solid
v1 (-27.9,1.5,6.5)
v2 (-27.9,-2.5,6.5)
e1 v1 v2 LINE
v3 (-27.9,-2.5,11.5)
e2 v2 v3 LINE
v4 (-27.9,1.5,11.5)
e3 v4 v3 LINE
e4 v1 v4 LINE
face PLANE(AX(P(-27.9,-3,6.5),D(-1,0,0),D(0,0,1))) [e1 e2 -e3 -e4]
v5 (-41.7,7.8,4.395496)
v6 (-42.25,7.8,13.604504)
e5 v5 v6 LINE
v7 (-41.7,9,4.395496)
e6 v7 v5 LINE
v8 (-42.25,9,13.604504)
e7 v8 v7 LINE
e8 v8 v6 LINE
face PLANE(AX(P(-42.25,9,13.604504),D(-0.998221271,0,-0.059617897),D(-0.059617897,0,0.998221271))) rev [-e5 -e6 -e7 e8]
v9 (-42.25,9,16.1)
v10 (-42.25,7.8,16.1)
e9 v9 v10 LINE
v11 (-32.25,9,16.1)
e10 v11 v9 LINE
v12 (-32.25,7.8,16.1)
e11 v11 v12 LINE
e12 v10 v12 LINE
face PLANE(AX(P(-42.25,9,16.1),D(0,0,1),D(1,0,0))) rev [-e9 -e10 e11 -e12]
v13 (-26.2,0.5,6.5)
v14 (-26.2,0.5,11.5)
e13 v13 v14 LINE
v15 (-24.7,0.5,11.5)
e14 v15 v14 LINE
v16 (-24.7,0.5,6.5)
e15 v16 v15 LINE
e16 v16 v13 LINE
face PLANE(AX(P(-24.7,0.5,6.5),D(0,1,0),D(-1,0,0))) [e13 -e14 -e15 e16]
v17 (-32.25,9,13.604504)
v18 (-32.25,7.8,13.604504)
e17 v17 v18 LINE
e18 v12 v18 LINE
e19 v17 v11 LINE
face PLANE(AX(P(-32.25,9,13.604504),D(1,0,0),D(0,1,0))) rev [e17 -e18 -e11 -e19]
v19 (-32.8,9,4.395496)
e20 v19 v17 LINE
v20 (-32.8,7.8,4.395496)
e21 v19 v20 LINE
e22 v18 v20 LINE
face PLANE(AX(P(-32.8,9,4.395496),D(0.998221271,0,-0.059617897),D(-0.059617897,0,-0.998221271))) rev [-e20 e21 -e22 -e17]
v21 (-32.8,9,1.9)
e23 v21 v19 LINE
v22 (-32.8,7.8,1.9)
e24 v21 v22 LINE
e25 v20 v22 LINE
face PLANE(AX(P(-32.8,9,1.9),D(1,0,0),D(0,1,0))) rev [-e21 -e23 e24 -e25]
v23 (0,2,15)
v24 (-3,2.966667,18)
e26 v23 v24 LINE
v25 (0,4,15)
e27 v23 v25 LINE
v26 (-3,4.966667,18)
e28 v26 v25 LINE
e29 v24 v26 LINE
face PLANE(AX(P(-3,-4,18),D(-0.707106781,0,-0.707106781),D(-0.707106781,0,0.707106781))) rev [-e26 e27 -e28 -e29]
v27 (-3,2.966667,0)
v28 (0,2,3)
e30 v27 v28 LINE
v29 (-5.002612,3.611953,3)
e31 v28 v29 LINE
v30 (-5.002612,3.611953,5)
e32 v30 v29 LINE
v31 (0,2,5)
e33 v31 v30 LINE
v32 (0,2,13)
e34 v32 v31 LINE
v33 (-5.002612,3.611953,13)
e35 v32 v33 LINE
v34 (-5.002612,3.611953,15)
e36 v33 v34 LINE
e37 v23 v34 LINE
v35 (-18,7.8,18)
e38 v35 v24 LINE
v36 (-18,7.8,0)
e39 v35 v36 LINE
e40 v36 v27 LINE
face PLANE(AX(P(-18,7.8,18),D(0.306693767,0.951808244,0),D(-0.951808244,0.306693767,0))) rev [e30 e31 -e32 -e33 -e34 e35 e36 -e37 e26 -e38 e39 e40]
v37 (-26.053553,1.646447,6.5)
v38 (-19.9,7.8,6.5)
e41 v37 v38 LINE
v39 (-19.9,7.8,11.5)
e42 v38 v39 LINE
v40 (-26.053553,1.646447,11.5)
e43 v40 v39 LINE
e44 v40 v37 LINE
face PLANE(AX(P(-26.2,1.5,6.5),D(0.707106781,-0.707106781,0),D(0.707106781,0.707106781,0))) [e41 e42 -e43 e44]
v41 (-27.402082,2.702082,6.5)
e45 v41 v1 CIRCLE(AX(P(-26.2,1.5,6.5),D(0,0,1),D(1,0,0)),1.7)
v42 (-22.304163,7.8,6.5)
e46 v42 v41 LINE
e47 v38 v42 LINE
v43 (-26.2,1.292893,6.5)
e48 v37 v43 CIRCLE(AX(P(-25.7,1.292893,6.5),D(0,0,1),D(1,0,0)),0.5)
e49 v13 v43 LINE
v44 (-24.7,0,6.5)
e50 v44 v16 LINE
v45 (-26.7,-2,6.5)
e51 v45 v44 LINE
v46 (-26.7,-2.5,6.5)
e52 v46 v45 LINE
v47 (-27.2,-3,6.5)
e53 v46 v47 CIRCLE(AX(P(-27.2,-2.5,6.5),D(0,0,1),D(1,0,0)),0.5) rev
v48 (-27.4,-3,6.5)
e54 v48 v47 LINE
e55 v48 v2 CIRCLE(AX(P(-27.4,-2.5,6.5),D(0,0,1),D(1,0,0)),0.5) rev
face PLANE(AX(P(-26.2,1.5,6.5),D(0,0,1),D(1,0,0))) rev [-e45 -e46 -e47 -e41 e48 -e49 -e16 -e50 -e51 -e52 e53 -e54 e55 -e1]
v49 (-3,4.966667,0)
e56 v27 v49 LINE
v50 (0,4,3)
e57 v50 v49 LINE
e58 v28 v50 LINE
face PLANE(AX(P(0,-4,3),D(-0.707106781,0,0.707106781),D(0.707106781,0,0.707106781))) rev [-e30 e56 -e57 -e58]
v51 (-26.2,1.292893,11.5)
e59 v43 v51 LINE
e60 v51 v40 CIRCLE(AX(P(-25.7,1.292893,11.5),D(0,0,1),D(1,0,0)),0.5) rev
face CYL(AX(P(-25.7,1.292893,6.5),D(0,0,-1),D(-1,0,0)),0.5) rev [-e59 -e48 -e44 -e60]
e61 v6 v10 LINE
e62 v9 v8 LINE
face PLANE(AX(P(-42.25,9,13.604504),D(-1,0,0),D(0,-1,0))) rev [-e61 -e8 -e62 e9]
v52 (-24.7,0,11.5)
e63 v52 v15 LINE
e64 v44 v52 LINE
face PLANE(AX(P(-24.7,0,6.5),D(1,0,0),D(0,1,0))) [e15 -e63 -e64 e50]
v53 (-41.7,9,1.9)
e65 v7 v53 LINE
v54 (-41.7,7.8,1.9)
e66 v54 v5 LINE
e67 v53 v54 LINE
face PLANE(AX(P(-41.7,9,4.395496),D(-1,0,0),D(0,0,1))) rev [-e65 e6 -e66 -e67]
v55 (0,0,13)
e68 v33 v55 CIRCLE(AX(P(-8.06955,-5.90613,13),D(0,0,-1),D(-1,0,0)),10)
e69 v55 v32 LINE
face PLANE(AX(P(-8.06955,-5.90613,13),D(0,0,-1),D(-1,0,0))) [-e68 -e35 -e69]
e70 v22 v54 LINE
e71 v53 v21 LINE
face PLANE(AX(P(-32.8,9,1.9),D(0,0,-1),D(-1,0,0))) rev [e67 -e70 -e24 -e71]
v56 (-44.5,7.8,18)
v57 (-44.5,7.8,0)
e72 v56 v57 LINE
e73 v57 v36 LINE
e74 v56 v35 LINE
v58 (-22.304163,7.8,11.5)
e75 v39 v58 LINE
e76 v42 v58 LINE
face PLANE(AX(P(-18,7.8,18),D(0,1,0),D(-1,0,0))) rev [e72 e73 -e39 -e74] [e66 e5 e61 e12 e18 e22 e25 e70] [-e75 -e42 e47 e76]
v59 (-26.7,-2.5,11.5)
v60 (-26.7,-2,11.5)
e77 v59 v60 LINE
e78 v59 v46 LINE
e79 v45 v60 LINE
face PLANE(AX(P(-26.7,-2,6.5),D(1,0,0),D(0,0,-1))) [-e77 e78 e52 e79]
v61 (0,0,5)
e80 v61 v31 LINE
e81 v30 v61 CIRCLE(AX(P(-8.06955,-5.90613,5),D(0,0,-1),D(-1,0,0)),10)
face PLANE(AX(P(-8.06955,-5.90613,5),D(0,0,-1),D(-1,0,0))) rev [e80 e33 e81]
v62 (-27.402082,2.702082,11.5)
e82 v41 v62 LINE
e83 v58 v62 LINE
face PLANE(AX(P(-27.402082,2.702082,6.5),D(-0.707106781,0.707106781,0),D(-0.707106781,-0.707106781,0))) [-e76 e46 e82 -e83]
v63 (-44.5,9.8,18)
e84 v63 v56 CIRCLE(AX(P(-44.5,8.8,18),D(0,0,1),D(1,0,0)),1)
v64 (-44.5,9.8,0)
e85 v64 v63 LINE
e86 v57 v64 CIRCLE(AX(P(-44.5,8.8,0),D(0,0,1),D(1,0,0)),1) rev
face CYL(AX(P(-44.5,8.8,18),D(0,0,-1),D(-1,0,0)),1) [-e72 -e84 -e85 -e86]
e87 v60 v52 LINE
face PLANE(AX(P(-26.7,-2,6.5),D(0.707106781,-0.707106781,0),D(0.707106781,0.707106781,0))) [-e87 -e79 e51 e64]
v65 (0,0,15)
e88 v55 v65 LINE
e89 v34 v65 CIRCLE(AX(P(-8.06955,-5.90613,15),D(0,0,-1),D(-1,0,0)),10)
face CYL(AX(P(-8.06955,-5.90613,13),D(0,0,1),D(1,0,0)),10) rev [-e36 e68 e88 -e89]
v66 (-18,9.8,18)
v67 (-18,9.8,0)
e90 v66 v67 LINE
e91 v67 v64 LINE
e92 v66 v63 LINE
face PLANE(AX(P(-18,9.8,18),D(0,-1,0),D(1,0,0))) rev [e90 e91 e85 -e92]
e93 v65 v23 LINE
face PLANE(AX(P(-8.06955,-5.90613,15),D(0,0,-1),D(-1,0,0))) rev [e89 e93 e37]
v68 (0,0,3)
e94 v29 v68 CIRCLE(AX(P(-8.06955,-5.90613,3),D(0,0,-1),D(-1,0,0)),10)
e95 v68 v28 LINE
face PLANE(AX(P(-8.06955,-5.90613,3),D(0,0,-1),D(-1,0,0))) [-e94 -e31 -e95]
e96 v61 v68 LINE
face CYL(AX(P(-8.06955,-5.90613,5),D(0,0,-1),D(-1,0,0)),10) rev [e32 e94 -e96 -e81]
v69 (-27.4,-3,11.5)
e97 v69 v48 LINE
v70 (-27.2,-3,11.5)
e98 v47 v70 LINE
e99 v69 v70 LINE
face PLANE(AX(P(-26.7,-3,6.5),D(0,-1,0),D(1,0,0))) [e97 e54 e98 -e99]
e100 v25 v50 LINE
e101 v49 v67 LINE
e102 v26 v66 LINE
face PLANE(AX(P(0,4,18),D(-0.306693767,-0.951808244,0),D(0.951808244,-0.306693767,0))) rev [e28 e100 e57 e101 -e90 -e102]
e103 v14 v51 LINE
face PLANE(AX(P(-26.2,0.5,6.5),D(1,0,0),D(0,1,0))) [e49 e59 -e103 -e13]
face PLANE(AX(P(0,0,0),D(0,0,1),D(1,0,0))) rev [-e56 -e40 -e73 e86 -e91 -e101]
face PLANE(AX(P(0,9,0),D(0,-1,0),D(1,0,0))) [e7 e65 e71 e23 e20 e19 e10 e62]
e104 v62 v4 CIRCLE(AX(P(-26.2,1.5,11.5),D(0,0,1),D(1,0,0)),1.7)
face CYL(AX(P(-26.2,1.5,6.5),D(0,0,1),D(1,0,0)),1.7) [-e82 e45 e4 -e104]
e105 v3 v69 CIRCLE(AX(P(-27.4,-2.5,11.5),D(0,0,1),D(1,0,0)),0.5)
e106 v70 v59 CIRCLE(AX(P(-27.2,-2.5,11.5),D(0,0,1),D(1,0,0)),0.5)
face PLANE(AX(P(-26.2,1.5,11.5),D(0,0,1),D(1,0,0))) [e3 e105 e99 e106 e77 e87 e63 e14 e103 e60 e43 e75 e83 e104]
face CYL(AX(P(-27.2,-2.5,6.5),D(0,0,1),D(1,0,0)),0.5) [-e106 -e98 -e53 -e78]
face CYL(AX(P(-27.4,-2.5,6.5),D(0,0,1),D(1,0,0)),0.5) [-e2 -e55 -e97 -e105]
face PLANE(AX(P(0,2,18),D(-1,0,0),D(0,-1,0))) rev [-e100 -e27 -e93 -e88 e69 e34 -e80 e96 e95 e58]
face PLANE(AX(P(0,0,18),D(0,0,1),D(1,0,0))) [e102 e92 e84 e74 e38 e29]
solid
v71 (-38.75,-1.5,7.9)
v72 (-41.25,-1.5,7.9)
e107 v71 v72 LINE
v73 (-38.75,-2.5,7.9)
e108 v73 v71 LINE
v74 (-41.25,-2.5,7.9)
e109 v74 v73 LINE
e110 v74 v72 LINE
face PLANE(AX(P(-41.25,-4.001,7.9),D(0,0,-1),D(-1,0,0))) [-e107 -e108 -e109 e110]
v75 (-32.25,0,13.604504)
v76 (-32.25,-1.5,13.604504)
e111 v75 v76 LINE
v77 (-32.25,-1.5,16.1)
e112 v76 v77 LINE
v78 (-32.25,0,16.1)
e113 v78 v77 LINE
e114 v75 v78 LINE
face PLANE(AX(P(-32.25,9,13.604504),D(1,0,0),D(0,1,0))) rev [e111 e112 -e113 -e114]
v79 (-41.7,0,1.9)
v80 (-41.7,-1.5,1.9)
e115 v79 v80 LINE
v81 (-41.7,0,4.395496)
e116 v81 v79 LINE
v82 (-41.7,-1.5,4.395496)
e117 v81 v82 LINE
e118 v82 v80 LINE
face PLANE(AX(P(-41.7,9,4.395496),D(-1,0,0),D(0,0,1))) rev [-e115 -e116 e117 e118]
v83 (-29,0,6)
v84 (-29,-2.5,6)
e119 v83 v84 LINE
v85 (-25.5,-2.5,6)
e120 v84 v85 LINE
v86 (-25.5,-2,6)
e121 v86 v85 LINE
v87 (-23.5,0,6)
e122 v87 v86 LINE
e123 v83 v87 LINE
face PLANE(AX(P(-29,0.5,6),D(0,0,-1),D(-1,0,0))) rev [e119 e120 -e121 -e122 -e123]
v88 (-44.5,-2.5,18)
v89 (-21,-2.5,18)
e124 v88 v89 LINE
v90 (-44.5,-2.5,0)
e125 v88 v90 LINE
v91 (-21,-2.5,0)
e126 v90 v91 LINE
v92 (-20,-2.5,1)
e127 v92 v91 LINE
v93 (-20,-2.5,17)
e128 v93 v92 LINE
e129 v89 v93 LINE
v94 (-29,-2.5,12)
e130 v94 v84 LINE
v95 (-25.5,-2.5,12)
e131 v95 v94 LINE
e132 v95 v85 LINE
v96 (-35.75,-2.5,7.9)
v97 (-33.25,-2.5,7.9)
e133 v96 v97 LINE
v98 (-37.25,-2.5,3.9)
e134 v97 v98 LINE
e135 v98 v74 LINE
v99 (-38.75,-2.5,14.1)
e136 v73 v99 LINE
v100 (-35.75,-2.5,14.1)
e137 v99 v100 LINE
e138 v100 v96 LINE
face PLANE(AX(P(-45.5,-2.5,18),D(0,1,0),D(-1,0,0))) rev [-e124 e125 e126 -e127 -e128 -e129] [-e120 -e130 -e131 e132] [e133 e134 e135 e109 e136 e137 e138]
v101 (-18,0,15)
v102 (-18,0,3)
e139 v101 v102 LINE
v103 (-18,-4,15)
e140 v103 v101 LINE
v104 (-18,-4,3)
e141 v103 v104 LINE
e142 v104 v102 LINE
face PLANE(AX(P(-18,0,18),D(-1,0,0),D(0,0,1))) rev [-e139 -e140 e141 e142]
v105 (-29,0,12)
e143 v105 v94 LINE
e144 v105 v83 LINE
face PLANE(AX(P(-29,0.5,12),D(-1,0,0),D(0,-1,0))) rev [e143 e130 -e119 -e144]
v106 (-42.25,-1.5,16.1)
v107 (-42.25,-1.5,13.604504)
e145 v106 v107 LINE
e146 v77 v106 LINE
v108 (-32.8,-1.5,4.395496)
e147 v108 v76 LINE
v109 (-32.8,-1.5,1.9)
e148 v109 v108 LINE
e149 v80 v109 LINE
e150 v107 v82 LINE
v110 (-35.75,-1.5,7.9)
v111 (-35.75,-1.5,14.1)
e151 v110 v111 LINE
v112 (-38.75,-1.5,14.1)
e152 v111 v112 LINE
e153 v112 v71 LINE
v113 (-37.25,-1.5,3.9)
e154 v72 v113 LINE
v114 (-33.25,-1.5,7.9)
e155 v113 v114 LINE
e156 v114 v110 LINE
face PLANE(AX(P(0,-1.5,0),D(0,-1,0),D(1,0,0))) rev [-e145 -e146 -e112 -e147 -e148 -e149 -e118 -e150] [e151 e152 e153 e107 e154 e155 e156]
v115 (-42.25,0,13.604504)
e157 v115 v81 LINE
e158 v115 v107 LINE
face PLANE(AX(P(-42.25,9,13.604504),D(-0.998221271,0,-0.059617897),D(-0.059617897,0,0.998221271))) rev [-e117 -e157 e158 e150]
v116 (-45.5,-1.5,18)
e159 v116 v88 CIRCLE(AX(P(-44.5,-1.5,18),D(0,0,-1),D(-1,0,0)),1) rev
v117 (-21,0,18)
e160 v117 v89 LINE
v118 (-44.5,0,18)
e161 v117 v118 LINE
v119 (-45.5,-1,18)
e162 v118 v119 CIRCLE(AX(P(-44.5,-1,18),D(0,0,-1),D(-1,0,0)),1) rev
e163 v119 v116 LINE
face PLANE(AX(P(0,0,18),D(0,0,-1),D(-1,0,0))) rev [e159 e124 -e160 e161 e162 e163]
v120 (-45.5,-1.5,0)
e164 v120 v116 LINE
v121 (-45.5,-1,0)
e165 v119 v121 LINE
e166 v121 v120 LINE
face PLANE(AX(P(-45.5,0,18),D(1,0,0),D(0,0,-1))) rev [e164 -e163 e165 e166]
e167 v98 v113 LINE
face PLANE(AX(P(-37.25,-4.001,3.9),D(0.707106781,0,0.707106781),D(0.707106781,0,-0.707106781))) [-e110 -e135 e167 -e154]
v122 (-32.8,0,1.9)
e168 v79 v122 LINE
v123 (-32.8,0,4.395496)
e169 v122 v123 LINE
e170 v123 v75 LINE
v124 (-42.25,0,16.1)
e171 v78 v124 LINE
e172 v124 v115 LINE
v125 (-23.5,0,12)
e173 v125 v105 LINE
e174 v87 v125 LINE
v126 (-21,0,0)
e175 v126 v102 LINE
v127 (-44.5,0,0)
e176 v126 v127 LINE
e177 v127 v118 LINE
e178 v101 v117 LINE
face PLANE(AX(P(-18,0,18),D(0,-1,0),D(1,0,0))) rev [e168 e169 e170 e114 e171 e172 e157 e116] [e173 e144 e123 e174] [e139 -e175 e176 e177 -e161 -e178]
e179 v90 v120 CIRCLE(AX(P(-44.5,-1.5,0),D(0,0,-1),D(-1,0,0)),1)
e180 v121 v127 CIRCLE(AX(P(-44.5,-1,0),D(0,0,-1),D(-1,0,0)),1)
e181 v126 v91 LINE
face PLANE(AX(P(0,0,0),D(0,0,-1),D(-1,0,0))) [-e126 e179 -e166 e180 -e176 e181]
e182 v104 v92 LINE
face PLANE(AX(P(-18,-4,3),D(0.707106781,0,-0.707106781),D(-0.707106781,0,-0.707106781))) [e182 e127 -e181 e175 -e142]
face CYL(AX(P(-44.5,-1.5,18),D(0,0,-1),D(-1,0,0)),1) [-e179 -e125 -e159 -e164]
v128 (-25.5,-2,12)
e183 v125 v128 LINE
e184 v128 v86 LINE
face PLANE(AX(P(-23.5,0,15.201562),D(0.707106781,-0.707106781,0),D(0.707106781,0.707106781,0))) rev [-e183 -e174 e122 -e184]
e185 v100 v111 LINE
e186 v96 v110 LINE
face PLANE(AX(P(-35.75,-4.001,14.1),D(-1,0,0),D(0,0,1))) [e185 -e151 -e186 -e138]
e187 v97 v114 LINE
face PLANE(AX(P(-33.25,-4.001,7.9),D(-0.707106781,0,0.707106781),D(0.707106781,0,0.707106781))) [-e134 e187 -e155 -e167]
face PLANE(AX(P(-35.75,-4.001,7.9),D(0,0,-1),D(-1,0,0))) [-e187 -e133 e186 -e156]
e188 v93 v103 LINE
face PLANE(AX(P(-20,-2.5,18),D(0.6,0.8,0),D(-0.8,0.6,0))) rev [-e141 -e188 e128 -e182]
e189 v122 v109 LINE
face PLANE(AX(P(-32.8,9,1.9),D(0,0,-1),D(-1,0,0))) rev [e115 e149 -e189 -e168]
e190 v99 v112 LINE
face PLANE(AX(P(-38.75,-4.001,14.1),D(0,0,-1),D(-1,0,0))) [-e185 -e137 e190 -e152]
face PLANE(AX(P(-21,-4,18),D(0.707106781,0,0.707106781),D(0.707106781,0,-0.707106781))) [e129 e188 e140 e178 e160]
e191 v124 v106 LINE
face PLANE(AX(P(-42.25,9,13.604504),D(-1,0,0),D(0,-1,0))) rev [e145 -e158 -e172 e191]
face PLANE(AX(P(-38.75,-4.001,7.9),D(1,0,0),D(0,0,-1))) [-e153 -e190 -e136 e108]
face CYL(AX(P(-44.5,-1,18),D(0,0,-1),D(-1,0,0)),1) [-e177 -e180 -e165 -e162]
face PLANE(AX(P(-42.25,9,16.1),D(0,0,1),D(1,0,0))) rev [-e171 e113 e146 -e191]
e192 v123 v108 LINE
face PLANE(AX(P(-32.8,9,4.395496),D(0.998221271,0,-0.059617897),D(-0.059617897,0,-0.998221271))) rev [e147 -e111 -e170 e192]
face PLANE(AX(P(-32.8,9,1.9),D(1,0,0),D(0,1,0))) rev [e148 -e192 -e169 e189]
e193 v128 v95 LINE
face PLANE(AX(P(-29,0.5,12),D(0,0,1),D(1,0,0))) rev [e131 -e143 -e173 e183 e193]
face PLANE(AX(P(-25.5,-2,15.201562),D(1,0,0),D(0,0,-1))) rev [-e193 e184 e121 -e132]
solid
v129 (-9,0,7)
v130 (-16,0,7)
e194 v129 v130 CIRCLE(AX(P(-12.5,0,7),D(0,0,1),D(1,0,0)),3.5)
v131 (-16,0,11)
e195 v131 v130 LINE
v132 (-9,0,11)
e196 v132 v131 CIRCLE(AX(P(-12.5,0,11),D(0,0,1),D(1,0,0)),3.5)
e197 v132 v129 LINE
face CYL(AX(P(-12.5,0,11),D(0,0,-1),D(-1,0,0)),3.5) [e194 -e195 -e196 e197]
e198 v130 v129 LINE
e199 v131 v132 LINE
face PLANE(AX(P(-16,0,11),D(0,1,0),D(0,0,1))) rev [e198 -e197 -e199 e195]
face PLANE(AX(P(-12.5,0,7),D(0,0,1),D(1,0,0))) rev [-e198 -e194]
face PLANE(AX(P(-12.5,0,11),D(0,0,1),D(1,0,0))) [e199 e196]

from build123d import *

# Parameters (mm, degrees)
BOSS_EXTRUDE1_DEPTH     = 18
BOSS_EXTRUDE1_2_DEPTH   = 18
SKETCH2_W               = 5.5
SKETCH2_H               = 6
CUT_EXTRUDE1_DEPTH      = 3
BOSS_EXTRUDE2_DEPTH     = 6
BOSS_EXTRUDE3_START     = -9
BOSS_EXTRUDE3_DEPTH     = 2.5
FILLET7_R               = 1
FILLET8_R               = 1
FILLET10_R              = 1
FILLET11_R              = 1
BOSS_EXTRUDE4_START     = -3
BOSS_EXTRUDE4_DEPTH     = 2
BOSS_EXTRUDE5_START     = -13
BOSS_EXTRUDE5_DEPTH     = 2
FILLET12_R              = 0.5
FILLET13_R              = 0.5
CUT_EXTRUDE2_DEPTH      = 1.5
CUT_EXTRUDE2_DEPTH_BACK = 9
CUT_EXTRUDE3_DEPTH      = 51.839846577
CUT_EXTRUDE9_DEPTH      = 51.453344785
CUT_EXTRUDE9_DEPTH_BACK = 2.5
CUT_EXTRUDE10_DEPTH     = 1
BOSS_EXTRUDE8_START     = 7
BOSS_EXTRUDE8_DEPTH     = 4


with BuildPart() as part:
    # Sketch1 → Boss-Extrude1 (new body)
    with BuildSketch(Plane.XY):
        Polygon((0, 4), (-18, 9.8), (-45.5, 9.8), (-45.5, 7.8), (-18, 7.8), (0, 2), align=None)
    extrude(amount=BOSS_EXTRUDE1_DEPTH)

    # Sketch4 → Boss-Extrude3 (add, symmetric)
    with BuildSketch(Plane.XY.offset(18).offset(BOSS_EXTRUDE3_START)):
        with BuildLine():
            Line((-26.7, -2), (-24.7, 0))
            Line((-24.7, 0), (-24.7, 0.5))
            Line((-24.7, 0.5), (-26.2, 0.5))
            Line((-26.2, 0.5), (-26.2, 1.5))
            Line((-26.2, 1.5), (-19.9, 7.8))
            Line((-19.9, 7.8), (-22.304163056, 7.8))
            Line((-22.304163056, 7.8), (-27.402081528, 2.702081528))
            ThreePointArc((-27.402081528, 2.702081528), (-27.770595205, 2.150561835), (-27.9, 1.5))
            Line((-27.9, 1.5), (-27.9, -3))
            Line((-27.9, -3), (-26.7, -3))
            Line((-26.7, -3), (-26.7, -2))
        make_face()
    extrude(amount=BOSS_EXTRUDE3_DEPTH, both=True)

    # Fillet8
    fillet8_edges = [part.edges().sort_by_distance(p)[0] for p in [
        (-45.5, 7.8, 9),
    ]]
    fillet(fillet8_edges, radius=FILLET8_R)

    # Fillet10
    fillet10_edges = [part.edges().sort_by_distance(p)[0] for p in [
        (-45.5, 9.8, 9),
    ]]
    fillet(fillet10_edges, radius=FILLET10_R - 0.0001)  # a hair under: the kernel refuses the full size

    # Sketch5 → Boss-Extrude4 (add)
    with BuildSketch(Plane.XY.offset(18).offset(BOSS_EXTRUDE4_START)):
        with BuildLine():
            Line((0, 2), (0, 0))
            ThreePointArc((0, 0), (-2.215757041, 2.201466243), (-5.002612018, 3.611952761))
            Line((-5.002612018, 3.611952761), (0, 2))
        make_face()
    extrude(amount=-BOSS_EXTRUDE4_DEPTH)

    # Sketch5<2> → Boss-Extrude5 (add)
    with BuildSketch(Plane.XY.offset(18).offset(BOSS_EXTRUDE5_START)):
        with BuildLine():
            Line((0, 2), (0, 0))
            ThreePointArc((0, 0), (-2.215757041, 2.201466243), (-5.002612018, 3.611952761))
            Line((-5.002612018, 3.611952761), (0, 2))
        make_face()
    extrude(amount=-BOSS_EXTRUDE5_DEPTH)

    # Fillet12
    fillet12_edges = [part.edges().sort_by_distance(p)[0] for p in [
        (-26.7, -3, 9),
        (-27.9, -3, 9),
    ]]
    fillet(fillet12_edges, radius=FILLET12_R)

    # Fillet13
    fillet13_edges = [part.edges().sort_by_distance(p)[0] for p in [
        (-26.2, 1.5, 9),
    ]]
    fillet(fillet13_edges, radius=FILLET13_R)


with BuildPart() as body_2:
    # Sketch1 → Boss-Extrude1 2 (new body)
    with BuildSketch(Plane.XY):
        Polygon((-18, 0), (-45.5, 0), (-45.5, -2.5), (-20, -2.5), (-18, -4), align=None)
    extrude(amount=BOSS_EXTRUDE1_2_DEPTH)

    # Sketch2 → Cut-Extrude1 (cut)
    with BuildSketch(Plane.XZ.offset(2.5)):
        with Locations((-26.25, 9)):
            Rectangle(SKETCH2_W, SKETCH2_H)
    extrude(amount=-CUT_EXTRUDE1_DEPTH, mode=Mode.SUBTRACT)

    # Sketch3 → Boss-Extrude2 (add)
    with BuildSketch(Plane.XY.offset(6)):
        Polygon((-23.5, 0), (-25.5, -2), (-25.5, -2.5), (-23.5, -2.5), align=None)
    extrude(amount=BOSS_EXTRUDE2_DEPTH)

    # Fillet7
    fillet7_edges = [body_2.edges().sort_by_distance(p)[0] for p in [
        (-45.5, 0, 9),
    ]]
    fillet(fillet7_edges, radius=FILLET7_R)

    # Fillet11
    fillet11_edges = [body_2.edges().sort_by_distance(p)[0] for p in [
        (-45.5, -2.5, 9),
    ]]
    fillet(fillet11_edges, radius=FILLET11_R)


with BuildPart() as cut_extrude2_tool:
    # Sketch6 → Cut-Extrude2 (new, two sides: drawn at the far end of the back side and taken through both)
    with BuildSketch(Plane.XZ.offset(-CUT_EXTRUDE2_DEPTH_BACK)):
        Polygon((-32.8, 1.9), (-41.7, 1.9), (-41.7, 4.395495943), (-42.25, 13.604504057), (-42.25, 16.1), (-32.25, 16.1), (-32.25, 13.604504057), (-32.8, 4.395495943), align=None)
    extrude(amount=CUT_EXTRUDE2_DEPTH + CUT_EXTRUDE2_DEPTH_BACK)


with BuildPart() as part_1:
    add(part.part)

    # Cut-Extrude2: cut by cut_extrude2_tool
    add(cut_extrude2_tool.part, mode=Mode.SUBTRACT)

    # Sketch7 → Cut-Extrude3 (cut, through all)
    with BuildSketch(Plane(origin=(0, 9.8, 0), x_dir=(1, 0, 0), z_dir=(0, 1, 0))):
        Polygon((0, -3), (-3, 0), (-45.5, 0), (-45.5, -18), (-3, -18), (0, -15), (2, -15), (2, -20), (-48, -20), (-48, 2), (2, 2), (2, -3), align=None)
    extrude(amount=-CUT_EXTRUDE3_DEPTH, mode=Mode.SUBTRACT)


with BuildPart() as body_2_1:
    add(body_2.part)

    # Cut-Extrude2: cut by cut_extrude2_tool
    add(cut_extrude2_tool.part, mode=Mode.SUBTRACT)

    # Sketch8 → Cut-Extrude9 (cut, two sides: drawn at the far end of the back side and taken through both)
    with BuildSketch(Plane.XZ.offset(2.5).offset(-CUT_EXTRUDE9_DEPTH_BACK)):
        Polygon((-18, 15), (-16, 15), (-16, 20), (-47.5, 20), (-47.5, -2), (-16, -2), (-16, 3), (-18, 3), (-21, 0), (-45.5, 0), (-45.5, 18), (-21, 18), align=None)
    extrude(amount=CUT_EXTRUDE9_DEPTH + CUT_EXTRUDE9_DEPTH_BACK, mode=Mode.SUBTRACT)

    # Sketch9 → Cut-Extrude10 (cut)
    with BuildSketch(Plane.XZ.offset(1.5)):
        Polygon((-38.75, 14.1), (-35.75, 14.1), (-35.75, 7.9), (-33.25, 7.9), (-37.25, 3.9), (-41.25, 7.9), (-38.75, 7.9), align=None)
    extrude(amount=CUT_EXTRUDE10_DEPTH, mode=Mode.SUBTRACT)


with BuildPart() as body_3:
    # Sketch11 → Boss-Extrude8 (new body)
    with BuildSketch(Plane.XY.offset(BOSS_EXTRUDE8_START)):
        with BuildLine():
            Line((-16, 0), (-9, 0))
            ThreePointArc((-9, 0), (-12.5, 3.5), (-16, 0))
        make_face()
    extrude(amount=BOSS_EXTRUDE8_DEPTH)


solid = Compound([part_1.part, body_2_1.part, body_3.part])
